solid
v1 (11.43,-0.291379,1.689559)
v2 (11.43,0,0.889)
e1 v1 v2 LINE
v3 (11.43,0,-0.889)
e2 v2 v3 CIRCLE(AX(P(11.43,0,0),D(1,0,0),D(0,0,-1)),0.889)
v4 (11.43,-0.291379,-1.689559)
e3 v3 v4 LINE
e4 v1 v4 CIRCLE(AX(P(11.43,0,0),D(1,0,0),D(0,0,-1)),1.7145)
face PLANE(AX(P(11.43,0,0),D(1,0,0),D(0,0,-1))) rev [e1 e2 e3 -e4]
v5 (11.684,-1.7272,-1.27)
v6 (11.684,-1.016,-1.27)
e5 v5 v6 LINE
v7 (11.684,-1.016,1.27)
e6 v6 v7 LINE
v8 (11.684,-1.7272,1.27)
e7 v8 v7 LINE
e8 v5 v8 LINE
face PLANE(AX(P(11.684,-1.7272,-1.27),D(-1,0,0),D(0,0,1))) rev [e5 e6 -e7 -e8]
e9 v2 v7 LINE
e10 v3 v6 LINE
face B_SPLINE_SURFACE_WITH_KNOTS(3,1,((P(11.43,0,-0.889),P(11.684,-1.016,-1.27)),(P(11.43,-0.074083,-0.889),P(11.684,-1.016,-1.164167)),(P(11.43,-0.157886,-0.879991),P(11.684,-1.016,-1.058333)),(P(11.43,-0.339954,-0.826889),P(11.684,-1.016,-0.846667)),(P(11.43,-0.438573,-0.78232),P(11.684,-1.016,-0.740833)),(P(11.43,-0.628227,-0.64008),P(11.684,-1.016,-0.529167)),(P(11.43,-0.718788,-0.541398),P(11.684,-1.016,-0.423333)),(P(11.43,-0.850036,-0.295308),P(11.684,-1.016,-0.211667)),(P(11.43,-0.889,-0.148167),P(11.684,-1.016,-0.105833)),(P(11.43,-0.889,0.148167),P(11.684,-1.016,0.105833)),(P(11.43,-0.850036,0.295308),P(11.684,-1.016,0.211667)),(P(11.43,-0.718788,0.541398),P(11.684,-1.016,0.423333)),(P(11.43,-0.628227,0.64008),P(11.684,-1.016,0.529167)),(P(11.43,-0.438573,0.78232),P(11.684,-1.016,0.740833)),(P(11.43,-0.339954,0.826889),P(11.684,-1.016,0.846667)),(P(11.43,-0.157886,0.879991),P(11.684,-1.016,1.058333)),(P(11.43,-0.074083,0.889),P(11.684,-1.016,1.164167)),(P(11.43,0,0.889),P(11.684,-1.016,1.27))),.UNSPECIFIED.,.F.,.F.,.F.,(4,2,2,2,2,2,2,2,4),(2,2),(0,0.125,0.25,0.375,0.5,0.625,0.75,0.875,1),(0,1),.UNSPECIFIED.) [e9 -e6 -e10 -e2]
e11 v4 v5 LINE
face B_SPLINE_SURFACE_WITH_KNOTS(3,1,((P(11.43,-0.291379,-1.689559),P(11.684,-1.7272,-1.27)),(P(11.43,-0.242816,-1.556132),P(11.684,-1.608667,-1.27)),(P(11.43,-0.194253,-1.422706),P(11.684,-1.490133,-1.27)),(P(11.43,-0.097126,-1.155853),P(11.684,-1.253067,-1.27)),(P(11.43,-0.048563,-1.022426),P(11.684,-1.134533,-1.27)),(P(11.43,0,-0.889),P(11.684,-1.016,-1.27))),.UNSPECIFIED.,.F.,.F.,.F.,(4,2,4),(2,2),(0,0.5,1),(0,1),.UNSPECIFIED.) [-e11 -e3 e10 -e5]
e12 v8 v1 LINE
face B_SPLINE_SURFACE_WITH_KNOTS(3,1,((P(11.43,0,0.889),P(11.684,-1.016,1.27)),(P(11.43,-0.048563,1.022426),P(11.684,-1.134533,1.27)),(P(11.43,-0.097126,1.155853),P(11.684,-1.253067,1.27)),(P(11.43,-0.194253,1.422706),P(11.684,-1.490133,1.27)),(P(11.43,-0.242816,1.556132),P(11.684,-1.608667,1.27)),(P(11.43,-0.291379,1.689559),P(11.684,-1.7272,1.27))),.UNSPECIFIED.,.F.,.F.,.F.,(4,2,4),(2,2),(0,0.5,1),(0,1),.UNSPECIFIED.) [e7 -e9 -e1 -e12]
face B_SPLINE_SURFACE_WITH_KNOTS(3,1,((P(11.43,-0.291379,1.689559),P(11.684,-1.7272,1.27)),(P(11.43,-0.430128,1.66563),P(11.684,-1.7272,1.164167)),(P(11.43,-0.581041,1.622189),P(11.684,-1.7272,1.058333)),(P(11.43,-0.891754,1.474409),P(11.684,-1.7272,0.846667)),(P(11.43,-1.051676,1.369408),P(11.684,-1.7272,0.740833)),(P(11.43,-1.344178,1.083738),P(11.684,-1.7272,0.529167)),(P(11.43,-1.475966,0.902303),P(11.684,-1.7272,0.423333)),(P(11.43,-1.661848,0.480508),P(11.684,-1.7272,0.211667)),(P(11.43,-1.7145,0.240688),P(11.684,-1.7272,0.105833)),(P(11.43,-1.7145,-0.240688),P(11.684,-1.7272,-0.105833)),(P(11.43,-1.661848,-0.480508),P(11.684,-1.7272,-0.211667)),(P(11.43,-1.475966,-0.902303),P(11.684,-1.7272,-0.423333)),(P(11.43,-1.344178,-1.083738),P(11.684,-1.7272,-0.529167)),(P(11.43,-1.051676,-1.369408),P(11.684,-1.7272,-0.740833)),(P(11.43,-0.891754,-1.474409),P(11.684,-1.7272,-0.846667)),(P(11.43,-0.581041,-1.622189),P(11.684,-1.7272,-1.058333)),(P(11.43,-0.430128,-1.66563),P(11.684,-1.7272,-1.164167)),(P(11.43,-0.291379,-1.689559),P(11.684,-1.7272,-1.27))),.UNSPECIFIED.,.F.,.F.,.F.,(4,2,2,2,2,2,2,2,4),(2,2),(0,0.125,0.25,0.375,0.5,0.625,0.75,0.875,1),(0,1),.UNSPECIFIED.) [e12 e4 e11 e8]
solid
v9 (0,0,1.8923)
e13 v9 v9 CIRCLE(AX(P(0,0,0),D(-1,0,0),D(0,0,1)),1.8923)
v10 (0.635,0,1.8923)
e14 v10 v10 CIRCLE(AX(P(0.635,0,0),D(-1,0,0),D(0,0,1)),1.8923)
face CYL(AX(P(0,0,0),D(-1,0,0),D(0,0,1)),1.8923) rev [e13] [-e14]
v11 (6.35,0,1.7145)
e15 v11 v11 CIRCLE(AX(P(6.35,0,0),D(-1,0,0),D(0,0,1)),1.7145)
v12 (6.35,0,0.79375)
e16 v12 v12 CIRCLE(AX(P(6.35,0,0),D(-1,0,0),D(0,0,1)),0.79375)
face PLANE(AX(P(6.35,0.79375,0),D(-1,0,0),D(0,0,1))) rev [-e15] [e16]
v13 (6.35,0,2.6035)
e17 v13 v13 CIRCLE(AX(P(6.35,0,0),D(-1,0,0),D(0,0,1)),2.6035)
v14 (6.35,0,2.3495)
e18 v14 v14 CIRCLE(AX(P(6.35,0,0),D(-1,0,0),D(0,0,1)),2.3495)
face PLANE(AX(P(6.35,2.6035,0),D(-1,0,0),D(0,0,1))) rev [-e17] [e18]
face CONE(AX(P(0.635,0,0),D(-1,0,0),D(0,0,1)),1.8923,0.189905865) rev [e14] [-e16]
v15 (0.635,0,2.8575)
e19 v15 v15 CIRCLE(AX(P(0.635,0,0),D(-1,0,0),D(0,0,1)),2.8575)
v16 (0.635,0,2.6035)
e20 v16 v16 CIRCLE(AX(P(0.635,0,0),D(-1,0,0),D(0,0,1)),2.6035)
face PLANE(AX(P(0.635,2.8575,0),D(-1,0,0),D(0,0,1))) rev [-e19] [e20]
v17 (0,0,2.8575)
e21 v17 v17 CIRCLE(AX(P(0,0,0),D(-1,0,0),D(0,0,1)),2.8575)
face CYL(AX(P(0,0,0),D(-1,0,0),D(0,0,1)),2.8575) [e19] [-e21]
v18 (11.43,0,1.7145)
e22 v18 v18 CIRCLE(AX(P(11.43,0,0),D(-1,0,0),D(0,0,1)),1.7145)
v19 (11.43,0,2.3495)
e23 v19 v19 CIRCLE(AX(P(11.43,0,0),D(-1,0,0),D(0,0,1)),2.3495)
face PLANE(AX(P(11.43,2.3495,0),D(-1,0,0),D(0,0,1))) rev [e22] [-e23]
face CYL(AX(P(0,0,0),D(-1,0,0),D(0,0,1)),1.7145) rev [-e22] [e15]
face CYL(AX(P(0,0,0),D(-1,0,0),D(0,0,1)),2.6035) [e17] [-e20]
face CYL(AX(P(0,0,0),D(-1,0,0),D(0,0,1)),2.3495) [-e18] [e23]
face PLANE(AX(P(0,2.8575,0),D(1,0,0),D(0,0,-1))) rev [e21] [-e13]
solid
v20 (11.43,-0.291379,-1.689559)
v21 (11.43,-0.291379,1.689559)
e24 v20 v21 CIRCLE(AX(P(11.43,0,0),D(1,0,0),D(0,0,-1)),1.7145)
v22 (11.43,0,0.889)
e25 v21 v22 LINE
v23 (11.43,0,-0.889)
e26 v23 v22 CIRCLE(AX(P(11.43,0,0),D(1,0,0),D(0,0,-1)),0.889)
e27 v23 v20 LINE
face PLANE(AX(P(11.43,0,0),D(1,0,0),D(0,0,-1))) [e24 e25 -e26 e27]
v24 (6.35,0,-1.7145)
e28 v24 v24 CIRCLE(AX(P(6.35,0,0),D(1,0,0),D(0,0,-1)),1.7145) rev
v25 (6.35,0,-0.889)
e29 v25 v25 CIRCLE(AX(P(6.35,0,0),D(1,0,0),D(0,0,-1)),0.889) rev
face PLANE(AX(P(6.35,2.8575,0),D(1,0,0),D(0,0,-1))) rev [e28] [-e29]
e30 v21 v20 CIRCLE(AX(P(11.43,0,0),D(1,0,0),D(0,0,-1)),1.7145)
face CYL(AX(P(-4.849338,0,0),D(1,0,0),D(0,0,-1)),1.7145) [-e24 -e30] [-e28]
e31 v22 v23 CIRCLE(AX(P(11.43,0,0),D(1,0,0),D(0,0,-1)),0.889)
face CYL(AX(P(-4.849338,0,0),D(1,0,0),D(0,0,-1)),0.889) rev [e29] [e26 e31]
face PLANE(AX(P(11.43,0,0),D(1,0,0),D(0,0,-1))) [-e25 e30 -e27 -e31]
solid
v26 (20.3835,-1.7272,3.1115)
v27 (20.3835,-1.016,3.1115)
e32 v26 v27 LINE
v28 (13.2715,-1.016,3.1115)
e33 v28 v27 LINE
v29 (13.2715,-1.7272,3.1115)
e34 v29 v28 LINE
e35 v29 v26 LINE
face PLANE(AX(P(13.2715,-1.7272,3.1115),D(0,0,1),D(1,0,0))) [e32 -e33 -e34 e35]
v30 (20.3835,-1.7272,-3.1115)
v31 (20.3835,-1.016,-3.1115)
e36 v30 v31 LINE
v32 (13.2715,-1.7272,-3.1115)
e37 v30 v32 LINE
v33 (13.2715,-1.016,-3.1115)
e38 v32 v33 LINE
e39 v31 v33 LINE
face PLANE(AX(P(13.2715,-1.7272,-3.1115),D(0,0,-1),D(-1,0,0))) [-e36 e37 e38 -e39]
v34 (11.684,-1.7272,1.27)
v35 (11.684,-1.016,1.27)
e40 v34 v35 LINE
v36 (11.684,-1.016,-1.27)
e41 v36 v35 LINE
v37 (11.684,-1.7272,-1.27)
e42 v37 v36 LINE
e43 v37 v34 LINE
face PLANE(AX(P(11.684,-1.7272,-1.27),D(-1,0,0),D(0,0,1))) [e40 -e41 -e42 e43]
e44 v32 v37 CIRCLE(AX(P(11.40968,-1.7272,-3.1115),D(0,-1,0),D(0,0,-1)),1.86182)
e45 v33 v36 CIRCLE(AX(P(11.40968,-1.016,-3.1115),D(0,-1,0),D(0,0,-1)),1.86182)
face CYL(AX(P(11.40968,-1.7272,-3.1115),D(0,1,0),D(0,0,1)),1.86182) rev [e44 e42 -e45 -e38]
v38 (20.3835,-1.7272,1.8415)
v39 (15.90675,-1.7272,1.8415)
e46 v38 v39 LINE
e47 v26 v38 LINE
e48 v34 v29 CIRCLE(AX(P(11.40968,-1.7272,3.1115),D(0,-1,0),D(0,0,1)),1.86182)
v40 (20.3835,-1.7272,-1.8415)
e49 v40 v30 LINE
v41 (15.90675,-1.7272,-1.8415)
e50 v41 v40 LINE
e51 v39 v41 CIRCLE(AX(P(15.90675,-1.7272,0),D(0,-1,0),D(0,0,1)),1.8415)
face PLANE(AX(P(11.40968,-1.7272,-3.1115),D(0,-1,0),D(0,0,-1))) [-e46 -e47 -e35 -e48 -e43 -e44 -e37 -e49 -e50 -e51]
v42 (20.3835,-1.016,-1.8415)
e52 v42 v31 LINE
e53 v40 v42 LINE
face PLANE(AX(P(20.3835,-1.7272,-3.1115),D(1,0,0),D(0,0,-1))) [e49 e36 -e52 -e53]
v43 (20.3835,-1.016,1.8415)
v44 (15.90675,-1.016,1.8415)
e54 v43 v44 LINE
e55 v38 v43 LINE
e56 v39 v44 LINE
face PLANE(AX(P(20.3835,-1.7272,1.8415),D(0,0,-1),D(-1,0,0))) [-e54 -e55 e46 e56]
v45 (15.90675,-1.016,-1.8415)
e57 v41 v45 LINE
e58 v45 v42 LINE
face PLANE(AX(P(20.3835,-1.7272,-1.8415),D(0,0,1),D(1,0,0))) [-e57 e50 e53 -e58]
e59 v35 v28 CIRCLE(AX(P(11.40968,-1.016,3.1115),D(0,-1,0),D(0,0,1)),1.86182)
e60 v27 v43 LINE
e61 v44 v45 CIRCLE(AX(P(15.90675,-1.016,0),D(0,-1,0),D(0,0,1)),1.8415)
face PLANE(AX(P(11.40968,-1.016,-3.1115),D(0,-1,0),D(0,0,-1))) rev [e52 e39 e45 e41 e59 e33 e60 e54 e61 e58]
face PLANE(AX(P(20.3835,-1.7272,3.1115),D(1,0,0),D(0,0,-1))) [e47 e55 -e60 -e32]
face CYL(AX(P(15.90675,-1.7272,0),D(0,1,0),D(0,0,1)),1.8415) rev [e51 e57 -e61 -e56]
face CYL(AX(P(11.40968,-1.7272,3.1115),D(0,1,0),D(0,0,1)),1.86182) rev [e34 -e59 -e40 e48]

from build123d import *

# Parameters (mm, degrees)
EXTRUDE6_DEPTH = 0.7112
SKETCH11_R     = 1.7145
SKETCH11_R_2   = 0.889
EXTRUDE7_DEPTH = 5.08


with BuildPart() as part:
    # Sketch5 → Revolve1 (revolve)
    with BuildSketch(Plane.XY, mode=Mode.PRIVATE) as revolve1_sk:
        Polygon((0, 2.8575), (0.635, 2.8575), (0.635, 2.6035), (6.35, 2.6035), (6.35, 2.3495), (11.43, 2.3495), (11.43, 1.7145), (6.35, 1.7145), (6.35, 0.79375), (0.635, 1.8923), (0, 1.8923), align=None)
    revolve(revolve1_sk.sketch.rotate(Axis((0, 0, 0), (1, 0, 0)), 90), axis=Axis((0, 0, 0), (1, 0, 0)))


with BuildPart() as body_2:
    # Sketch7 → Extrude6 (new body)
    with BuildSketch(Plane(origin=(0, -1.016, 0), x_dir=(-1, 0, 0), z_dir=(0, 1, 0))):
        with BuildLine():
            Line((-13.2715, -3.1115), (-20.3835, -3.1115))
            Line((-20.3835, -3.1115), (-20.3835, -1.8415))
            Line((-20.3835, -1.8415), (-15.90675, -1.8415))
            ThreePointArc((-15.90675, -1.8415), (-14.06525, 0), (-15.90675, 1.8415))
            Line((-15.90675, 1.8415), (-20.3835, 1.8415))
            Line((-20.3835, 1.8415), (-20.3835, 3.1115))
            Line((-20.3835, 3.1115), (-13.2715, 3.1115))
            ThreePointArc((-13.2715, 3.1115), (-12.819841015, 1.895843953), (-11.684, 1.27))
            Line((-11.684, 1.27), (-11.684, -1.27))
            ThreePointArc((-11.684, -1.27), (-12.819841015, -1.895843953), (-13.2715, -3.1115))
        make_face()
    extrude(amount=-EXTRUDE6_DEPTH)


with BuildPart() as body_3:
    # Sketch11 → Extrude7 (new body)
    with BuildSketch(Plane(origin=(11.43, 0, 0), x_dir=(0, 0, -1), z_dir=(1, 0, 0))):
        Circle(SKETCH11_R)
        Circle(SKETCH11_R_2, mode=Mode.SUBTRACT)
    extrude(amount=-EXTRUDE7_DEPTH)


with BuildPart() as body_4:
    # Loft3: read off the stored shape, not the designer's step
    # Loft3: loft between two sections, ruled curve by curve
    loft3_from = [
        Edge.make_bspline([(11.43, -0.291379498, 1.689558593), (11.43, -0.430127833, 1.665630201), (11.43, -0.581040717, 1.622189064), (11.43, -0.891753825, 1.474408623), (11.43, -1.051676044, 1.369408232), (11.43, -1.344177572, 1.083738003), (11.43, -1.475965629, 0.902303445), (11.43, -1.661847679, 0.480508416), (11.43, -1.7145, 0.240688121), (11.43, -1.7145, -0.240688121), (11.43, -1.661847679, -0.480508416), (11.43, -1.475965629, -0.902303445), (11.43, -1.344177572, -1.083738003), (11.43, -1.051676044, -1.369408232), (11.43, -0.891753825, -1.474408623), (11.43, -0.581040717, -1.622189064), (11.43, -0.430127833, -1.665630201), (11.43, -0.291379498, -1.689558593)], [0, 0, 0, 0, 0.125, 0.125, 0.25, 0.25, 0.375, 0.375, 0.5, 0.5, 0.625, 0.625, 0.75, 0.75, 0.875, 0.875, 1, 1, 1, 1], 3),
        Edge.make_bspline([(11.43, -0.291379498, -1.689558593), (11.43, -0.242816249, -1.556132161), (11.43, -0.194252999, -1.422705728), (11.43, -0.097126499, -1.155852864), (11.43, -0.04856325, -1.022426432), (11.43, 0, -0.889)], [0, 0, 0, 0, 0.5, 0.5, 1, 1, 1, 1], 3),
        Edge.make_bspline([(11.43, 0, 0.889), (11.43, -0.04856325, 1.022426432), (11.43, -0.097126499, 1.155852864), (11.43, -0.194252999, 1.422705728), (11.43, -0.242816249, 1.556132161), (11.43, -0.291379498, 1.689558593)], [0, 0, 0, 0, 0.5, 0.5, 1, 1, 1, 1], 3),
        Edge.make_bspline([(11.43, 0, -0.889), (11.43, -0.074083333, -0.889), (11.43, -0.1578864, -0.879991467), (11.43, -0.3399536, -0.826888533), (11.43, -0.438573333, -0.78232), (11.43, -0.628226667, -0.64008), (11.43, -0.718787774, -0.541397924), (11.43, -0.850035755, -0.295307958), (11.43, -0.889, -0.148166667), (11.43, -0.889, 0.148166667), (11.43, -0.850035755, 0.295307958), (11.43, -0.718787774, 0.541397924), (11.43, -0.628226667, 0.64008), (11.43, -0.438573333, 0.78232), (11.43, -0.3399536, 0.826888533), (11.43, -0.1578864, 0.879991467), (11.43, -0.074083333, 0.889), (11.43, 0, 0.889)], [0, 0, 0, 0, 0.125, 0.125, 0.25, 0.25, 0.375, 0.375, 0.5, 0.5, 0.625, 0.625, 0.75, 0.75, 0.875, 0.875, 1, 1, 1, 1], 3),
    ]
    loft3_to = [
        Edge.make_bspline([(11.684, -1.7272, 1.27), (11.684, -1.7272, 1.164166667), (11.684, -1.7272, 1.058333333), (11.684, -1.7272, 0.846666667), (11.684, -1.7272, 0.740833333), (11.684, -1.7272, 0.529166667), (11.684, -1.7272, 0.423333333), (11.684, -1.7272, 0.211666667), (11.684, -1.7272, 0.105833333), (11.684, -1.7272, -0.105833333), (11.684, -1.7272, -0.211666667), (11.684, -1.7272, -0.423333333), (11.684, -1.7272, -0.529166667), (11.684, -1.7272, -0.740833333), (11.684, -1.7272, -0.846666667), (11.684, -1.7272, -1.058333333), (11.684, -1.7272, -1.164166667), (11.684, -1.7272, -1.27)], [0, 0, 0, 0, 0.125, 0.125, 0.25, 0.25, 0.375, 0.375, 0.5, 0.5, 0.625, 0.625, 0.75, 0.75, 0.875, 0.875, 1, 1, 1, 1], 3),
        Edge.make_bspline([(11.684, -1.7272, -1.27), (11.684, -1.608666667, -1.27), (11.684, -1.490133333, -1.27), (11.684, -1.253066667, -1.27), (11.684, -1.134533333, -1.27), (11.684, -1.016, -1.27)], [0, 0, 0, 0, 0.5, 0.5, 1, 1, 1, 1], 3),
        Edge.make_bspline([(11.684, -1.016, 1.27), (11.684, -1.134533333, 1.27), (11.684, -1.253066667, 1.27), (11.684, -1.490133333, 1.27), (11.684, -1.608666667, 1.27), (11.684, -1.7272, 1.27)], [0, 0, 0, 0, 0.5, 0.5, 1, 1, 1, 1], 3),
        Edge.make_bspline([(11.684, -1.016, -1.27), (11.684, -1.016, -1.164166667), (11.684, -1.016, -1.058333333), (11.684, -1.016, -0.846666667), (11.684, -1.016, -0.740833333), (11.684, -1.016, -0.529166667), (11.684, -1.016, -0.423333333), (11.684, -1.016, -0.211666667), (11.684, -1.016, -0.105833333), (11.684, -1.016, 0.105833333), (11.684, -1.016, 0.211666667), (11.684, -1.016, 0.423333333), (11.684, -1.016, 0.529166667), (11.684, -1.016, 0.740833333), (11.684, -1.016, 0.846666667), (11.684, -1.016, 1.058333333), (11.684, -1.016, 1.164166667), (11.684, -1.016, 1.27)], [0, 0, 0, 0, 0.125, 0.125, 0.25, 0.25, 0.375, 0.375, 0.5, 0.5, 0.625, 0.625, 0.75, 0.75, 0.875, 0.875, 1, 1, 1, 1], 3),
    ]
    loft3 = Solid(Shell([*[Face.make_surface_from_curves(loft3_from[k], loft3_to[k]) for k in range(4)], Face(Wire(loft3_from)), Face(Wire(loft3_to))]))
    add(loft3)


solid = Compound([part.part, body_2.part, body_3.part, body_4.part])
